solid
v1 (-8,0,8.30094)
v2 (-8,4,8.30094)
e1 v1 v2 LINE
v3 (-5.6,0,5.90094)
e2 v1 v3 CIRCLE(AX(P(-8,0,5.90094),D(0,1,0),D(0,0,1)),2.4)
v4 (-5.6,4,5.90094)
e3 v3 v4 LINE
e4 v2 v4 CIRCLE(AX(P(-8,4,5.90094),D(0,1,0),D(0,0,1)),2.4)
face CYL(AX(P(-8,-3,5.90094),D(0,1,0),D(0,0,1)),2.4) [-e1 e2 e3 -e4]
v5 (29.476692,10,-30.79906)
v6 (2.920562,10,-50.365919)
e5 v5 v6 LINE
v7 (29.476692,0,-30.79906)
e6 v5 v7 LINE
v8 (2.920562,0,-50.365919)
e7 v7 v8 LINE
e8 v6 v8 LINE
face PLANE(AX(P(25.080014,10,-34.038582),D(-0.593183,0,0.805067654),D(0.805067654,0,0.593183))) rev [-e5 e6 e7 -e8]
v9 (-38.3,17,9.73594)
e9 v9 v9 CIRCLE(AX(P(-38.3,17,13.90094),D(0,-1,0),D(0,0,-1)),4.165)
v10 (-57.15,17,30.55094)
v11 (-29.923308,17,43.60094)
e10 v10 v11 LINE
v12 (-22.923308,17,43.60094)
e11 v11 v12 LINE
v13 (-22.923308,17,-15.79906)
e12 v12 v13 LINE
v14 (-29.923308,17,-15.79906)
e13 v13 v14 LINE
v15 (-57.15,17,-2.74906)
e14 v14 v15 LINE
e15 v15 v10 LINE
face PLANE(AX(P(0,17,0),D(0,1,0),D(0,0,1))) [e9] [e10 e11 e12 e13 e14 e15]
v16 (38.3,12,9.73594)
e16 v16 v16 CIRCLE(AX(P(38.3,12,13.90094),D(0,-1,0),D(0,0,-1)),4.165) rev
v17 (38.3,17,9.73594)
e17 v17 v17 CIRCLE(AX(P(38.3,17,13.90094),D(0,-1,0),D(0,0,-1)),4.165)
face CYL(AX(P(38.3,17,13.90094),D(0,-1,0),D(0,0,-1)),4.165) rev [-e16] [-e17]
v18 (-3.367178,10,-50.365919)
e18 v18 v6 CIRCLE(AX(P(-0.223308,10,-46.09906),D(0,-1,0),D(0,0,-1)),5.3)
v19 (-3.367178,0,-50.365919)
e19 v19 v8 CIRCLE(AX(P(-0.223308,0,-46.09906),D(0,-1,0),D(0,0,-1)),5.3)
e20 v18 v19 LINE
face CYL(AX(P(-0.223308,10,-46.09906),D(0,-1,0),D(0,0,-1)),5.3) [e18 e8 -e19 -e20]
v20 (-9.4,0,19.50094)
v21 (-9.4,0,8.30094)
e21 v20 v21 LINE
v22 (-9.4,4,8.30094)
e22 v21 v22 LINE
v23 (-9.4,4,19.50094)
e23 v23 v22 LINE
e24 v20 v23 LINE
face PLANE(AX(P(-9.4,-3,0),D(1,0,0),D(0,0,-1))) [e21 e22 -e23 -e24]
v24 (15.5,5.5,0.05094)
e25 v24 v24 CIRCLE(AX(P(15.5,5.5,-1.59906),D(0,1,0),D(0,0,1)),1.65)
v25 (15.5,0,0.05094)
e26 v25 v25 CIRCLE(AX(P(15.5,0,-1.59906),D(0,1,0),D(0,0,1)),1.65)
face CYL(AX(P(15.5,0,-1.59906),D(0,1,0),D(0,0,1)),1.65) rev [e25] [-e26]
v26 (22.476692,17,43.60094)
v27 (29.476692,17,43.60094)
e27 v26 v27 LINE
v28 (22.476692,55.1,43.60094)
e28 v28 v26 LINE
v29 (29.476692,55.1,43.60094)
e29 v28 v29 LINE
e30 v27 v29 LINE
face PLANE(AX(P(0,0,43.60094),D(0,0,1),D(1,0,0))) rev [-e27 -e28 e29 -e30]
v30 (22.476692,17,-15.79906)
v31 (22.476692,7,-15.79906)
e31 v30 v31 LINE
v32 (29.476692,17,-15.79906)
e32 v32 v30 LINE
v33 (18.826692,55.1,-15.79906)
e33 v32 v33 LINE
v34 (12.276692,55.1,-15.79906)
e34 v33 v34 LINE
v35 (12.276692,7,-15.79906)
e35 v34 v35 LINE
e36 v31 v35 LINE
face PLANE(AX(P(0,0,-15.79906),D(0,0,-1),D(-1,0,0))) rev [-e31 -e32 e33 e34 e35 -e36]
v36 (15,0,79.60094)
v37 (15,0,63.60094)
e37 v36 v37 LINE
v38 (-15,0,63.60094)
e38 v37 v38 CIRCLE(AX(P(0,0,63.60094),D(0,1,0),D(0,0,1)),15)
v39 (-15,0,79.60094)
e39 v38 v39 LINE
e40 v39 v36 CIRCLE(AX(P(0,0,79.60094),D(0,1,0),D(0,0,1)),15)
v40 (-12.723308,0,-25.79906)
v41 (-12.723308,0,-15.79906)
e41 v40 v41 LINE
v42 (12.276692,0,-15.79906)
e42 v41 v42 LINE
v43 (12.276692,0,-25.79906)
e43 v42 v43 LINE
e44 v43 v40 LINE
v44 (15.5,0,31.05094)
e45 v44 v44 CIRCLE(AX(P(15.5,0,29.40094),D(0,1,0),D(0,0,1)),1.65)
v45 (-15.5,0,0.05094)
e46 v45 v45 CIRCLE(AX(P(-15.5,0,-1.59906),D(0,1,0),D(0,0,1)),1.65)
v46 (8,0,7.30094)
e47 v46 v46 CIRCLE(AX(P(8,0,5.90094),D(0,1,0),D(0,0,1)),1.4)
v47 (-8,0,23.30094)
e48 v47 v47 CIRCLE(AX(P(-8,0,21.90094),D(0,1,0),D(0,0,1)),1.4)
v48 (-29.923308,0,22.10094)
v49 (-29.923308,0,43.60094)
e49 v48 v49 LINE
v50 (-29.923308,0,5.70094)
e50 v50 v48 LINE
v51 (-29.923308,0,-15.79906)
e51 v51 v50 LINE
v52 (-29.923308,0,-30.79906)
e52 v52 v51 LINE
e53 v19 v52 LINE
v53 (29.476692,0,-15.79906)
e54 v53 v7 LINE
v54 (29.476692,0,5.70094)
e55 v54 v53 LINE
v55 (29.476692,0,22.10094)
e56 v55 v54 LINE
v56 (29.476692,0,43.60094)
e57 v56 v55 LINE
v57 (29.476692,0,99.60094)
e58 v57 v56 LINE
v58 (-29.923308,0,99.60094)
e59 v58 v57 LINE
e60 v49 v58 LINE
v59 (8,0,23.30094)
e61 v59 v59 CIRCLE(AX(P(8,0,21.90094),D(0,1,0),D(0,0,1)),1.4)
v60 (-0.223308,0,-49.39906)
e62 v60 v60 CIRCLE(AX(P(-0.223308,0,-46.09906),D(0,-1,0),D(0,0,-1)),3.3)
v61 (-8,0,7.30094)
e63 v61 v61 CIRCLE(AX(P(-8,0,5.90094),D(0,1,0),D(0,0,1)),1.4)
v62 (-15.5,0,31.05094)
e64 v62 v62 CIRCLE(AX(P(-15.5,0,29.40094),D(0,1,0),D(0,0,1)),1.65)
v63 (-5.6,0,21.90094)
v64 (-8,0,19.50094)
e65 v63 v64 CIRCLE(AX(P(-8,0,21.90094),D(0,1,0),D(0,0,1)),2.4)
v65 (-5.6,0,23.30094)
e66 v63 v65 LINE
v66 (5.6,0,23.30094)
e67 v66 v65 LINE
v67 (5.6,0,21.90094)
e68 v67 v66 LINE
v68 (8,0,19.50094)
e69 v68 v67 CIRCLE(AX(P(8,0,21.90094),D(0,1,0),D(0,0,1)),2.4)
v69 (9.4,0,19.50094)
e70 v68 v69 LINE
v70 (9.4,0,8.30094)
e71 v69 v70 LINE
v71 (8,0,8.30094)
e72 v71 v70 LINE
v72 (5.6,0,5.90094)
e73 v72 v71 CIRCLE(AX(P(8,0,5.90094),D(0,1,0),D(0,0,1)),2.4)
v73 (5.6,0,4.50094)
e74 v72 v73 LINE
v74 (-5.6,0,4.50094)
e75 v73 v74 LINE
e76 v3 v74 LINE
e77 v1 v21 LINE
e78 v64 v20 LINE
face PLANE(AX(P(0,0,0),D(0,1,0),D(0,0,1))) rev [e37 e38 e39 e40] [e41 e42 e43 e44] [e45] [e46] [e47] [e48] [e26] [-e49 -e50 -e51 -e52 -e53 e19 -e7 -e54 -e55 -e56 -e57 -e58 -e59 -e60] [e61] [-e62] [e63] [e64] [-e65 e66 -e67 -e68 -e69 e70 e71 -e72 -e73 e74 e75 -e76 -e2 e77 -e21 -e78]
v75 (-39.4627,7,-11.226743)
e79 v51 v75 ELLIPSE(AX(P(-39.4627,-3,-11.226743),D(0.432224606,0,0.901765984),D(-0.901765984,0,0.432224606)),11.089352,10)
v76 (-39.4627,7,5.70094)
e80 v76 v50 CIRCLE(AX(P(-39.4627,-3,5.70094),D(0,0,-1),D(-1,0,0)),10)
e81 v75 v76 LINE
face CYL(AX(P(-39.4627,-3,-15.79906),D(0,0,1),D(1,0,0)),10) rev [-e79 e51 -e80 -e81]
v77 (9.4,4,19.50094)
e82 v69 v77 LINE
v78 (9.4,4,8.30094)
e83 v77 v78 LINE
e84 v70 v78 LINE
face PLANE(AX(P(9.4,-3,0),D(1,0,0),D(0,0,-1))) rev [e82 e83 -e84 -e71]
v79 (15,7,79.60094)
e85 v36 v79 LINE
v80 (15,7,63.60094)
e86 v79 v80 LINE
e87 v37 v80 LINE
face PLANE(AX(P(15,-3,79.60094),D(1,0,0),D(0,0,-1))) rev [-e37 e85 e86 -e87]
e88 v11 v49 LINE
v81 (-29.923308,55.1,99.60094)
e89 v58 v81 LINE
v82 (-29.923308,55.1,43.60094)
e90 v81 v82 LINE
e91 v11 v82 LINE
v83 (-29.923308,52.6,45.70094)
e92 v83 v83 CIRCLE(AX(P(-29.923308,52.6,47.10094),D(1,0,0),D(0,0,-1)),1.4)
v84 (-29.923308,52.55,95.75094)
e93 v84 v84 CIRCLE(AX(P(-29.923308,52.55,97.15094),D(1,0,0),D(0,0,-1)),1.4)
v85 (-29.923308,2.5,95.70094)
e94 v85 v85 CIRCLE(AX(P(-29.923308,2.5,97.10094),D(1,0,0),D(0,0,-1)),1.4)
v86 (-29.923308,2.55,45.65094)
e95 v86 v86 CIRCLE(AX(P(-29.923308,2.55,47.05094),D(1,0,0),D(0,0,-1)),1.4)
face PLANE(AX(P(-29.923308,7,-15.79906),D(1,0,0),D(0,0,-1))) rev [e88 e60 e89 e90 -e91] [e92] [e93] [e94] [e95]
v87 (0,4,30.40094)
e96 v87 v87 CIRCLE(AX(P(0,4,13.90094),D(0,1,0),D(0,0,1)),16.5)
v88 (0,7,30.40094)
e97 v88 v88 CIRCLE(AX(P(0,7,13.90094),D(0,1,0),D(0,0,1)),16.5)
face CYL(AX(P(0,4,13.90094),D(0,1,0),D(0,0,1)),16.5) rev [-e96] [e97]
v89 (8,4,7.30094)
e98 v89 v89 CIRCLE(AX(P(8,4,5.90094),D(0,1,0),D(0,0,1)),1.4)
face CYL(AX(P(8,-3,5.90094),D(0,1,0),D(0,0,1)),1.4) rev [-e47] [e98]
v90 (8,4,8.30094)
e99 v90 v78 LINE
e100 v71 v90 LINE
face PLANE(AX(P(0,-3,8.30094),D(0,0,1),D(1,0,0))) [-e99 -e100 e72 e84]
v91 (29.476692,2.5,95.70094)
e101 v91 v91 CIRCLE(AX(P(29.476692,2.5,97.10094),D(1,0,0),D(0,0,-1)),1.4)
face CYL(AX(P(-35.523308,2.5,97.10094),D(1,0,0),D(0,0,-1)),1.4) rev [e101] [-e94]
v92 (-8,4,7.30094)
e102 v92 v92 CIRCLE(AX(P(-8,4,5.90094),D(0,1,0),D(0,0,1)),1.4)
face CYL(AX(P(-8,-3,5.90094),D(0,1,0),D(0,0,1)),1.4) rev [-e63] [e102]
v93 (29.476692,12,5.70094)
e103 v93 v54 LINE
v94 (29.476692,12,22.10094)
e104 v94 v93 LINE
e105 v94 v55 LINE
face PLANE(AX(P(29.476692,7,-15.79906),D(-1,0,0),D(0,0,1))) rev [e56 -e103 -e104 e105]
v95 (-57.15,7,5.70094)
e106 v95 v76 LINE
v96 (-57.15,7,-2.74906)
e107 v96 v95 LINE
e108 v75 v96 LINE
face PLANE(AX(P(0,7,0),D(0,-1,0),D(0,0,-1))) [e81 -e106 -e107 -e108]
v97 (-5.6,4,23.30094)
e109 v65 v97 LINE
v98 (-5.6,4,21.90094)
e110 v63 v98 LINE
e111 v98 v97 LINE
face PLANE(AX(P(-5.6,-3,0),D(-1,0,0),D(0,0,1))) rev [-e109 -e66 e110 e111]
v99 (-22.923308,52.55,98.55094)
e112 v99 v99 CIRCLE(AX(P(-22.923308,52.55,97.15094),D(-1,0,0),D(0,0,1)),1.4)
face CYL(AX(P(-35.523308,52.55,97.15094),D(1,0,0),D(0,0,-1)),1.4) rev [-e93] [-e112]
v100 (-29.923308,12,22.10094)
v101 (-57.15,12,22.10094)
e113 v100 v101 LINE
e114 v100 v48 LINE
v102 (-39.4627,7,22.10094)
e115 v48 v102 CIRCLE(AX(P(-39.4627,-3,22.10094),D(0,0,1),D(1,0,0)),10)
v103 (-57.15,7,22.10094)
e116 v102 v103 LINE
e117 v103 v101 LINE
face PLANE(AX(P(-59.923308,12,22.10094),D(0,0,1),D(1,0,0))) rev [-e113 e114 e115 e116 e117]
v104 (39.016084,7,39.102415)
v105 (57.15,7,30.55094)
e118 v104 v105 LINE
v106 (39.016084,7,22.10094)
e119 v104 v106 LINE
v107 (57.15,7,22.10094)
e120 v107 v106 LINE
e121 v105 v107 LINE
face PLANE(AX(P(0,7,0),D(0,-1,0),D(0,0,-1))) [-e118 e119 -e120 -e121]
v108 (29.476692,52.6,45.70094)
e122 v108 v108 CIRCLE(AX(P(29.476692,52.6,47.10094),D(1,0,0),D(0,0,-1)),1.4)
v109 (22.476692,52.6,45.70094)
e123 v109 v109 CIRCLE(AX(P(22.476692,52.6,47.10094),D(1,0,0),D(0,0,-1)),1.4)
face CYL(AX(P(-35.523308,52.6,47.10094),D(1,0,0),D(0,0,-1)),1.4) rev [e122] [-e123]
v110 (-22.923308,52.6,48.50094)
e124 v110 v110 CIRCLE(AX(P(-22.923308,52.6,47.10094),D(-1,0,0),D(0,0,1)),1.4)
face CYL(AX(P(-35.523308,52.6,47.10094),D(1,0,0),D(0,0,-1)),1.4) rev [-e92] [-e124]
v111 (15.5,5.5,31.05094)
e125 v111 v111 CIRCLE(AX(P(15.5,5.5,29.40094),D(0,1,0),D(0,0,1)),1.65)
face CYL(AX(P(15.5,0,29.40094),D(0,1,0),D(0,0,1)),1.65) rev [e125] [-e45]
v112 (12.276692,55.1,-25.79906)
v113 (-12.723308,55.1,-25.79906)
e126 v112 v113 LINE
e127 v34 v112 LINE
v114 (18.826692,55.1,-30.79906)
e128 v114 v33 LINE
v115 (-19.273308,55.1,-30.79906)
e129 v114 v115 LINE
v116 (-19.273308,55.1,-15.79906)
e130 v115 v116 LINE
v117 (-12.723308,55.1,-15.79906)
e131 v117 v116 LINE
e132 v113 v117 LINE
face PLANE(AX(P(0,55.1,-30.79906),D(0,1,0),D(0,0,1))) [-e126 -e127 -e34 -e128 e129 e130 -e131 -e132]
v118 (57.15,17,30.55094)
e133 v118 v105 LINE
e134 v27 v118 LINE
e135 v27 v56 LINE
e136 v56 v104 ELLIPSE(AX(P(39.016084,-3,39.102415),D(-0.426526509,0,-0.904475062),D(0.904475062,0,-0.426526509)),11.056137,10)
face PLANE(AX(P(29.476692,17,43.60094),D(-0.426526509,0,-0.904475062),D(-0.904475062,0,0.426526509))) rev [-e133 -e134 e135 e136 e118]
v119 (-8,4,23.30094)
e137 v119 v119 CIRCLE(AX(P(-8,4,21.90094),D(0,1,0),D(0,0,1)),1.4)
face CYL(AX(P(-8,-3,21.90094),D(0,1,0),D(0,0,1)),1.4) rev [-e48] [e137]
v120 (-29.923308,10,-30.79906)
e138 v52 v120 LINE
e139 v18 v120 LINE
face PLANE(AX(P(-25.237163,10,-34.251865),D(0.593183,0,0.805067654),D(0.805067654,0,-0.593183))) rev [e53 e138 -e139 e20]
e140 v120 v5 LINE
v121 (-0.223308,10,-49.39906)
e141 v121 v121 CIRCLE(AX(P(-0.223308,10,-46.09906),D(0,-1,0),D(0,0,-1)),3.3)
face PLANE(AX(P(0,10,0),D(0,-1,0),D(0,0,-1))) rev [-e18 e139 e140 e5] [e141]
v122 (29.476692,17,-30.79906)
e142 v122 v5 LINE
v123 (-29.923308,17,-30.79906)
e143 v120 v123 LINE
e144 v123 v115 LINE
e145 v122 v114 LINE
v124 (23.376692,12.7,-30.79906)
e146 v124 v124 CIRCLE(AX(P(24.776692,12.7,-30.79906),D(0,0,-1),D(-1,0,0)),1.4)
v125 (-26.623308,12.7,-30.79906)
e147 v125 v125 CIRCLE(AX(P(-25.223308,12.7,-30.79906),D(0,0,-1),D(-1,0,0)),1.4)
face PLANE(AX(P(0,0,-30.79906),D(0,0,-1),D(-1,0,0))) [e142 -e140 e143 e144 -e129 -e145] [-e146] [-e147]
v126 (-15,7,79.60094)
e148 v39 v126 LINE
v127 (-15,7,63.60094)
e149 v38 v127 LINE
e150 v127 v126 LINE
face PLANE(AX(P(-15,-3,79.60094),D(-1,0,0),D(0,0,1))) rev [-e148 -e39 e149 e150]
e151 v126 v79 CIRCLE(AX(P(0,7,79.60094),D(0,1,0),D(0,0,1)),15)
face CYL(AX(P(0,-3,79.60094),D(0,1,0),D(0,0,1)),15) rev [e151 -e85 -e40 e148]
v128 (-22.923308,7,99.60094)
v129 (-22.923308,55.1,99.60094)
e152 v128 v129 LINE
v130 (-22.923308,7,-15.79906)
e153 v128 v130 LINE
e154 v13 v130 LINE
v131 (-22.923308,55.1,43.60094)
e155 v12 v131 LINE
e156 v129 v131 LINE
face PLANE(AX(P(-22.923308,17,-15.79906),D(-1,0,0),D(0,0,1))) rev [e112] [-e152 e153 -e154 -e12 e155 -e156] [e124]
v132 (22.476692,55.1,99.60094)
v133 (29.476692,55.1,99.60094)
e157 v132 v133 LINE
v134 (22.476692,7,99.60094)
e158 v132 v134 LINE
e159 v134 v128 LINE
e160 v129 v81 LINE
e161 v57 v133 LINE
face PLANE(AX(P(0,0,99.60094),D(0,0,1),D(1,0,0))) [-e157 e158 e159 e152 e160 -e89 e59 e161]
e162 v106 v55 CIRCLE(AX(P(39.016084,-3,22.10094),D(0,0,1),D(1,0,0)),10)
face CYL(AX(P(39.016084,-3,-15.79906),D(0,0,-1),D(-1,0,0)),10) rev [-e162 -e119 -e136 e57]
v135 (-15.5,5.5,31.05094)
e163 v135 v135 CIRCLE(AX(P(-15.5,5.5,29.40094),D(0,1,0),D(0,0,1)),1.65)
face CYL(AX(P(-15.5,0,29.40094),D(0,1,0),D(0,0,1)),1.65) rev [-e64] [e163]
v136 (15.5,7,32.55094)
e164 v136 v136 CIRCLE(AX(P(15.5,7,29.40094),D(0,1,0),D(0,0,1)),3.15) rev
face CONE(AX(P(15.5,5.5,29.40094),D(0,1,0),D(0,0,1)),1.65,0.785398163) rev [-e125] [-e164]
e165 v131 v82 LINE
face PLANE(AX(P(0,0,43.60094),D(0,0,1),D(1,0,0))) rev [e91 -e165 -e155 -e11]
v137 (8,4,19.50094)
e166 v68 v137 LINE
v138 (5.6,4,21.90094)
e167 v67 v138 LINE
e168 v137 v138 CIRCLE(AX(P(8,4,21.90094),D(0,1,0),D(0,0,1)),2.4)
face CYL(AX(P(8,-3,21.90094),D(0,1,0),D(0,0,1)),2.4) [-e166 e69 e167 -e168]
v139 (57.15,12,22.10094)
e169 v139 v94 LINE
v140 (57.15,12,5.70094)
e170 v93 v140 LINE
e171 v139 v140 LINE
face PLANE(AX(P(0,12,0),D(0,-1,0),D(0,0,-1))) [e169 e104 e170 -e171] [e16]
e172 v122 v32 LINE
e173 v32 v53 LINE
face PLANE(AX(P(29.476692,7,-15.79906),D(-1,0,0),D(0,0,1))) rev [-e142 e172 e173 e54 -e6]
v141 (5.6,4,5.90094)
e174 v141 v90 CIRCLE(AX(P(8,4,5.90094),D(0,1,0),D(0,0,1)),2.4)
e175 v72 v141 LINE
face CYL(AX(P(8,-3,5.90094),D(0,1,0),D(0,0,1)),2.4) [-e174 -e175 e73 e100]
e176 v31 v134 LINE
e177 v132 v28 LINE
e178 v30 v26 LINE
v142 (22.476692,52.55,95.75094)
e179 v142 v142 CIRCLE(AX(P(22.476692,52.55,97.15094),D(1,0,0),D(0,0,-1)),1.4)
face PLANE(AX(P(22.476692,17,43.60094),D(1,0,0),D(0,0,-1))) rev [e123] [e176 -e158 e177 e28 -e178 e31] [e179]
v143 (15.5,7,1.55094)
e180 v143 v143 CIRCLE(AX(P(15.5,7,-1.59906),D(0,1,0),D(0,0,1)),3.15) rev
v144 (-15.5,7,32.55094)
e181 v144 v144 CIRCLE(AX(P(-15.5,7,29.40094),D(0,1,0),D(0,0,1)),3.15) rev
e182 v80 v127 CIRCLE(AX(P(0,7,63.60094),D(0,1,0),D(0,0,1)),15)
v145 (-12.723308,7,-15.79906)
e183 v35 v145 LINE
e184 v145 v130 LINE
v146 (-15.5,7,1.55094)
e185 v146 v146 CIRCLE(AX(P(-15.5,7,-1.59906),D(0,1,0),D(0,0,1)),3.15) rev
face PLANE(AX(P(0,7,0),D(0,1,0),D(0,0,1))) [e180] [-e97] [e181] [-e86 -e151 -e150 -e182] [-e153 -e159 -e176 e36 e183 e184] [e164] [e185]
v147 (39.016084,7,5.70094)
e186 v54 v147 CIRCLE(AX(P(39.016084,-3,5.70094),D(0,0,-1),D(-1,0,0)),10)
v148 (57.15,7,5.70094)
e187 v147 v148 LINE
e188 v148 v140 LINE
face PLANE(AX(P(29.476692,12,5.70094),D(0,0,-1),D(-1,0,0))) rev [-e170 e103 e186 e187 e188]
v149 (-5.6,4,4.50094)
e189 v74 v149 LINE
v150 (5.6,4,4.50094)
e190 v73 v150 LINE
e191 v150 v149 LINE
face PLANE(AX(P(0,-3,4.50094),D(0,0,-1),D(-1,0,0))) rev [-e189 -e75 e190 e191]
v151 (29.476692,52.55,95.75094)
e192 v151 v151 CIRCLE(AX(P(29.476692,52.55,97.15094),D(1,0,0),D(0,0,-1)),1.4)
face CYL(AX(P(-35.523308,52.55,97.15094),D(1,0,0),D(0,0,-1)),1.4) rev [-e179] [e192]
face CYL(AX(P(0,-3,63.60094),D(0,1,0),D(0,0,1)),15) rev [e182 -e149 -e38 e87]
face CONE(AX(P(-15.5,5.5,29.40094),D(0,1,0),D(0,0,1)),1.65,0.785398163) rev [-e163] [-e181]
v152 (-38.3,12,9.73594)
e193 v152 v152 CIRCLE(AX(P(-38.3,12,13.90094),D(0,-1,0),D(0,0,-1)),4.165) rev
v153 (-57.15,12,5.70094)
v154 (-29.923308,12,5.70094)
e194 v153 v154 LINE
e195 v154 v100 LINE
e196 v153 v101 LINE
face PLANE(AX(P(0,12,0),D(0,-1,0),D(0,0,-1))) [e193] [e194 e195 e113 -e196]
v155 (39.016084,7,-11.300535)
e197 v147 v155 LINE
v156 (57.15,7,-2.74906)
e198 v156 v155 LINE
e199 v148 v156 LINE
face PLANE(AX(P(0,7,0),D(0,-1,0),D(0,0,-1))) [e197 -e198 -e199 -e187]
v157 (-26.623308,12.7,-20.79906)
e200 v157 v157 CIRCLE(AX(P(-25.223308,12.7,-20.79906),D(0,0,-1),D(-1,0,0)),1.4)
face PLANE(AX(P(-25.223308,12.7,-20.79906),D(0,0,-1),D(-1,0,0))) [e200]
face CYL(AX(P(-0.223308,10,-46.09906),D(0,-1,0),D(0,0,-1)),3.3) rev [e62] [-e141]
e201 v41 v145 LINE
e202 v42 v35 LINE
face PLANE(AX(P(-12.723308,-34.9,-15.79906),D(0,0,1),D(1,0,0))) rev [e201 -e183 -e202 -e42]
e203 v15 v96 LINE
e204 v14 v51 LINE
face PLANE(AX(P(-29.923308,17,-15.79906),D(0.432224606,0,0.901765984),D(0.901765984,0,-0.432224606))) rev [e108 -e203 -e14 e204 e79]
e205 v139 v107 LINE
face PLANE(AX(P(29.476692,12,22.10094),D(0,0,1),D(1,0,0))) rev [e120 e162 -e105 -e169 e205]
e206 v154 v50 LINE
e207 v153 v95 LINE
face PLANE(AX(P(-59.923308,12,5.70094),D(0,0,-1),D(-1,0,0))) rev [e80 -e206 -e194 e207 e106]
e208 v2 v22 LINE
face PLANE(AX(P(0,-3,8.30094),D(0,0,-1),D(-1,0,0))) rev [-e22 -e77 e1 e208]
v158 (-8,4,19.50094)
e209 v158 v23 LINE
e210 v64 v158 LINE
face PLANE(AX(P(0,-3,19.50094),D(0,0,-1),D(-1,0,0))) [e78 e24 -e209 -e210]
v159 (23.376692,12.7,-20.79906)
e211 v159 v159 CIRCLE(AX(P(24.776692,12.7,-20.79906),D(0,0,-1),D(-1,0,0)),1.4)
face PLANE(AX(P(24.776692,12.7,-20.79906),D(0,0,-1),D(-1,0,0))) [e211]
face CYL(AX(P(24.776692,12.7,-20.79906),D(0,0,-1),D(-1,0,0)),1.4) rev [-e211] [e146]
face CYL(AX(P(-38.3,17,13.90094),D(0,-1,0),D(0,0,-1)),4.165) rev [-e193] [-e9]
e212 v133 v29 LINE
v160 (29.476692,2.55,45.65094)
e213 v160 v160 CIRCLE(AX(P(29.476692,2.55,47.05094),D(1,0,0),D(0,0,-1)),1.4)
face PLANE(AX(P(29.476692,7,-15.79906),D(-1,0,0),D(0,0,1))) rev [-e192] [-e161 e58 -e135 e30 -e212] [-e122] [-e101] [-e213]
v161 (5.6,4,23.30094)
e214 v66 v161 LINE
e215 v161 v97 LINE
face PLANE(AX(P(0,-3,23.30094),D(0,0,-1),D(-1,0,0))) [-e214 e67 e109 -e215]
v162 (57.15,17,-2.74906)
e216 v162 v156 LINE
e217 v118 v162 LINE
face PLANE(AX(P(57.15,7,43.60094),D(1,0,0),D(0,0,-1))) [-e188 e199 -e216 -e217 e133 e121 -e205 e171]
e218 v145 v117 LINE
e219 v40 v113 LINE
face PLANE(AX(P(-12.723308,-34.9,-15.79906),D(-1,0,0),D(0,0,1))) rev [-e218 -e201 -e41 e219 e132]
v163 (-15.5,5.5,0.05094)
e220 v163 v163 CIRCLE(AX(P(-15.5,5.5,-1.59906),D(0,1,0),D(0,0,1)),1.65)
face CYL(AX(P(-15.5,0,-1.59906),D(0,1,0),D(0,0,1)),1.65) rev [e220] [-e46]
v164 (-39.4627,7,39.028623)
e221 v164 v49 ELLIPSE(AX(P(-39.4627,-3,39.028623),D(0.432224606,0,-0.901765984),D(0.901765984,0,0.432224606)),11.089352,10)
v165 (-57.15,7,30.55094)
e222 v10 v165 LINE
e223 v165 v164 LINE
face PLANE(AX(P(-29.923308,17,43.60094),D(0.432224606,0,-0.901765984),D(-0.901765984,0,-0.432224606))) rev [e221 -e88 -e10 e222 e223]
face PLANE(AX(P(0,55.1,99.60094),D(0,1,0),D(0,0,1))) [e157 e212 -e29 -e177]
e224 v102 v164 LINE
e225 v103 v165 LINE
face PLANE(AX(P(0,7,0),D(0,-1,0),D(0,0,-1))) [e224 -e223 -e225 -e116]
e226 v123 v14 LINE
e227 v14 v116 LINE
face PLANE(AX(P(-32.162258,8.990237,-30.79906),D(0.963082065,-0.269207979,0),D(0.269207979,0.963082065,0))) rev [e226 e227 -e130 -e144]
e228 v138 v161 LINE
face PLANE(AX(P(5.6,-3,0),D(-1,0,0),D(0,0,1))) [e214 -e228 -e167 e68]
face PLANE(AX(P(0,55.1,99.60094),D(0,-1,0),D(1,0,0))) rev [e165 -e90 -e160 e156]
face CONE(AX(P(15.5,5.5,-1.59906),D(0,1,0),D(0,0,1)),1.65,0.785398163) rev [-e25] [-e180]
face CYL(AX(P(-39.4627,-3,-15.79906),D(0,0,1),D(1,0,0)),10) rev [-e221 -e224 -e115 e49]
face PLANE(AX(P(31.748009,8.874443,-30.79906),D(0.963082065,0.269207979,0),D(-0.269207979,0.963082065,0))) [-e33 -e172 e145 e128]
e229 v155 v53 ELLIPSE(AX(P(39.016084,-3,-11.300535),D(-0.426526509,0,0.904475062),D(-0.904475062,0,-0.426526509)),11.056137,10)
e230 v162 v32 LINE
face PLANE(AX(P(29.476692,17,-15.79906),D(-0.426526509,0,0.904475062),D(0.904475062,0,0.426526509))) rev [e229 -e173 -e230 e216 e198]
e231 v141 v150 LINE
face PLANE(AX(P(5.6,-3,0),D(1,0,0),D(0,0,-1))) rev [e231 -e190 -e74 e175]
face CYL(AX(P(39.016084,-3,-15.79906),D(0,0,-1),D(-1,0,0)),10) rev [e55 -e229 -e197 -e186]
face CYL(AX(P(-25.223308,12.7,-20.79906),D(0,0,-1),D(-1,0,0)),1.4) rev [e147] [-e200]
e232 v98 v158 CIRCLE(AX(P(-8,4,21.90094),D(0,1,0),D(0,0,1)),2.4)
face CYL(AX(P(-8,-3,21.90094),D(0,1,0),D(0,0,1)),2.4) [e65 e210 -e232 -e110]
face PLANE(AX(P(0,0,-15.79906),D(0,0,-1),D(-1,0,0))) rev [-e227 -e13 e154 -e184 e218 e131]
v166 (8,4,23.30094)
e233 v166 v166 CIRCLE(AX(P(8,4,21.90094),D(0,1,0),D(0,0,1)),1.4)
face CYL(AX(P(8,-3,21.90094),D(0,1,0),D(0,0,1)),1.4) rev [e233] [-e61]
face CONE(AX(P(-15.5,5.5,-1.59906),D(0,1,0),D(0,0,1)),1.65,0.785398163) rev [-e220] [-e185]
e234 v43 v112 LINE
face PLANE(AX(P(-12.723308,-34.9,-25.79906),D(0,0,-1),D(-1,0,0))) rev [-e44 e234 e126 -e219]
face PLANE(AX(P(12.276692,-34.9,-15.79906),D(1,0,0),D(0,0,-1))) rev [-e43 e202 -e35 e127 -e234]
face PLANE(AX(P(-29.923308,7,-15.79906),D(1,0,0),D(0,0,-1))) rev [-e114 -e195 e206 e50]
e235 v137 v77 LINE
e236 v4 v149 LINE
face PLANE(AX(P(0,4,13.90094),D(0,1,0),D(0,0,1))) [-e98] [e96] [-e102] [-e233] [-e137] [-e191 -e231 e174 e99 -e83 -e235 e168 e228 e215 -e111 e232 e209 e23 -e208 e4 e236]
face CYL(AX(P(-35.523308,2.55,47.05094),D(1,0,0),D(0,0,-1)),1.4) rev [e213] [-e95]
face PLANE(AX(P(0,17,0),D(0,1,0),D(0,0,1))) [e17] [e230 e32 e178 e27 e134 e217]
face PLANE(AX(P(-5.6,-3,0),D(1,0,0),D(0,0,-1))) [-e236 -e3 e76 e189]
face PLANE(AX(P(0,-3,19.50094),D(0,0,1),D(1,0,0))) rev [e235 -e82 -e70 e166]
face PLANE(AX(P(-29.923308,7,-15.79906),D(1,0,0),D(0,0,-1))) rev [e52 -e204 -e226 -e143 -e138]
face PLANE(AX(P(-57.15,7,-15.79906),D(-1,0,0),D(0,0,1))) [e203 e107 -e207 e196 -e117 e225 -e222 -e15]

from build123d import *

# Parameters (mm, degrees)
SKETCH1_W           = 59.4
SKETCH1_H           = 59.4
BOSS_EXTRUDE1_DEPTH = 7
SKETCH2_R           = 16.5
CUT_EXTRUDE1_DEPTH  = 3
SKETCH4_R           = 1.65
CUT_EXTRUDE2_DEPTH  = 7
CHAMFER1_SIZE       = 1.5
SKETCH5_R           = 1.4
CUT_EXTRUDE3_DEPTH  = 7
SKETCH6_W           = 7
SKETCH6_H           = 59.4
BOSS_EXTRUDE2_DEPTH = 10
SKETCH7_W           = 27.226691729
SKETCH7_H           = 59.4
SKETCH7_W_2         = 27.673308271
BOSS_EXTRUDE3_DEPTH = 10
SKETCH8_R           = 4.165
CUT_EXTRUDE4_DEPTH  = 10
SKETCH9_W           = 30
SKETCH9_H           = 16.4
SKETCH9_W_2         = 36.39158208
CUT_EXTRUDE5_DEPTH  = 5
CUT_EXTRUDE6_DEPTH  = 10
BOSS_EXTRUDE4_DEPTH = 15
SKETCH12_W          = 25
SKETCH12_H          = 10
CUT_EXTRUDE7_DEPTH  = 90
SKETCH13_R          = 5.3
SKETCH13_R_2        = 3.3
BOSS_EXTRUDE5_DEPTH = 10
SKETCH14_R          = 1.4
CUT_EXTRUDE8_DEPTH  = 10
SKETCH17_W          = 7
SKETCH17_H          = 38.1
SKETCH17_W_2        = 45.4
SKETCH17_H_2        = 7
BOSS_EXTRUDE8_DEPTH = 56
FILLET1_R           = 10
SKETCH18_R          = 1.4
CUT_EXTRUDE10_DEPTH = 65
CUT_EXTRUDE12_DEPTH = 10


with BuildPart() as part:
    # Sketch1 → Boss-Extrude1 (new body)
    with BuildSketch(Plane(origin=(0, 0, 0), x_dir=(1, 0, 0), z_dir=(0, 1, 0))):
        with Locations((-0.223308271, -13.90093985)):
            Rectangle(SKETCH1_W, SKETCH1_H)
    extrude(amount=BOSS_EXTRUDE1_DEPTH)

    # Sketch2 → Cut-Extrude1 (cut)
    with BuildSketch(Plane(origin=(0, 7, 0), x_dir=(1, 0, 0), z_dir=(0, 1, 0))):
        with Locations(Location((0, -13.90093985, 0), (0, 0, 270))):
            Circle(SKETCH2_R)
    extrude(amount=-CUT_EXTRUDE1_DEPTH, mode=Mode.SUBTRACT)

    # Sketch4 → Cut-Extrude2 (cut)
    with BuildSketch(Plane(origin=(0, 7, 0), x_dir=(1, 0, 0), z_dir=(0, 1, 0))):
        with Locations(Location((-15.5, 1.59906015, 0), (0, 0, 270))):
            Circle(SKETCH4_R)
        with Locations(Location((15.5, 1.59906015, 0), (0, 0, 270))):
            Circle(SKETCH4_R)
        with Locations(Location((15.5, -29.40093985, 0), (0, 0, 270))):
            Circle(SKETCH4_R)
        with Locations(Location((-15.5, -29.40093985, 0), (0, 0, 270))):
            Circle(SKETCH4_R)
    extrude(amount=-CUT_EXTRUDE2_DEPTH, mode=Mode.SUBTRACT)

    # Chamfer1
    chamfer1_edges = [part.edges().sort_by_distance(p)[0] for p in [
        (-15.5, 7, 27.75093985),
        (15.5, 7, 27.75093985),
        (15.5, 7, -3.24906015),
        (-15.5, 7, -3.24906015),
    ]]
    chamfer(chamfer1_edges, length=CHAMFER1_SIZE)

    # Sketch5 → Cut-Extrude3 (cut)
    with BuildSketch(Plane(origin=(0, 4, 0), x_dir=(1, 0, 0), z_dir=(0, 1, 0))):
        with BuildLine():
            Line((9.4, -13.90093985), (0, -13.90093985))
            Line((0, -13.90093985), (0, -23.30093985))
            Line((0, -23.30093985), (5.6, -23.30093985))
            Line((5.6, -23.30093985), (5.6, -21.90093985))
            ThreePointArc((5.6, -21.90093985), (6.302943725, -20.203883575), (8, -19.50093985))
            Line((8, -19.50093985), (9.4, -19.50093985))
            Line((9.4, -19.50093985), (9.4, -13.90093985))
        make_face()
        with BuildLine():
            Line((0, -13.90093985), (-9.4, -13.90093985))
            Line((-9.4, -13.90093985), (-9.4, -19.50093985))
            Line((-9.4, -19.50093985), (-8, -19.50093985))
            ThreePointArc((-8, -19.50093985), (-6.302943725, -20.203883575), (-5.6, -21.90093985))
            Line((-5.6, -21.90093985), (-5.6, -23.30093985))
            Line((-5.6, -23.30093985), (0, -23.30093985))
            Line((0, -23.30093985), (0, -13.90093985))
        make_face()
        with BuildLine():
            ThreePointArc((-5.6, -5.90093985), (-6.302943725, -7.597996124), (-8, -8.30093985))
            Line((-8, -8.30093985), (-9.4, -8.30093985))
            Line((-9.4, -8.30093985), (-9.4, -13.90093985))
            Line((-9.4, -13.90093985), (0, -13.90093985))
            Line((0, -13.90093985), (0, -4.50093985))
            Line((0, -4.50093985), (-5.6, -4.50093985))
            Line((-5.6, -4.50093985), (-5.6, -5.90093985))
        make_face()
        with BuildLine():
            Line((0, -4.50093985), (0, -13.90093985))
            Line((0, -13.90093985), (9.4, -13.90093985))
            Line((9.4, -13.90093985), (9.4, -8.30093985))
            Line((9.4, -8.30093985), (8, -8.30093985))
            ThreePointArc((8, -8.30093985), (6.302943725, -7.597996124), (5.6, -5.90093985))
            Line((5.6, -5.90093985), (5.6, -4.50093985))
            Line((5.6, -4.50093985), (0, -4.50093985))
        make_face()
        with Locations(Location((8, -5.90093985, 0), (0, 0, 270))):
            Circle(SKETCH5_R)
        with Locations(Location((-8, -5.90093985, 0), (0, 0, 270))):
            Circle(SKETCH5_R)
        with Locations(Location((-8, -21.90093985, 0), (0, 0, 270))):
            Circle(SKETCH5_R)
        with Locations(Location((8, -21.90093985, 0), (0, 0, 270))):
            Circle(SKETCH5_R)
    extrude(amount=-CUT_EXTRUDE3_DEPTH, mode=Mode.SUBTRACT)

    # Sketch6 → Boss-Extrude2 (add)
    with BuildSketch(Plane(origin=(0, 7, 0), x_dir=(1, 0, 0), z_dir=(0, 1, 0))):
        with Locations((-26.423308271, -13.90093985)):
            Rectangle(SKETCH6_W, SKETCH6_H)
        with Locations((25.976691729, -13.90093985)):
            Rectangle(SKETCH6_W, SKETCH6_H)
    extrude(amount=BOSS_EXTRUDE2_DEPTH)

    # Sketch7 → Boss-Extrude3 (add)
    with BuildSketch(Plane(origin=(0, 17, 0), x_dir=(1, 0, 0), z_dir=(0, 1, 0))):
        with Locations((-43.536654136, -13.90093985)):
            Rectangle(SKETCH7_W, SKETCH7_H)
        with Locations((43.313345865, -13.90093985)):
            Rectangle(SKETCH7_W_2, SKETCH7_H)
    extrude(amount=-BOSS_EXTRUDE3_DEPTH)

    # Sketch8 → Cut-Extrude4 (cut)
    with BuildSketch(Plane.XZ.offset(-7)):
        with Locations(Location((-38.3, 13.90093985, 0), (0, 0, 270))):
            Circle(SKETCH8_R)
        with Locations(Location((38.3, 13.90093985, 0), (0, 0, 270))):
            Circle(SKETCH8_R)
    extrude(amount=-CUT_EXTRUDE4_DEPTH, mode=Mode.SUBTRACT)

    # Sketch9 → Cut-Extrude5 (cut)
    with BuildSketch(Plane.XZ.offset(-7)):
        with Locations((-44.923308271, 13.90093985)):
            Rectangle(SKETCH9_W, SKETCH9_H)
        with Locations((47.672482769, 13.90093985)):
            Rectangle(SKETCH9_W_2, SKETCH9_H)
    extrude(amount=-CUT_EXTRUDE5_DEPTH, mode=Mode.SUBTRACT)

    # Sketch10 → Cut-Extrude6 (cut)
    with BuildSketch(Plane.XZ.offset(-7)):
        Polygon((29.476691729, 43.60093985), (57.15, 30.55093985), (76.62509514, 37.490170253), (62.940914395, 60.152042306), align=None)
        Polygon((29.476691729, -15.79906015), (57.15, -2.74906015), (74.309790283, -17.328421705), (51.423897195, -33.903905564), align=None)
        Polygon((-29.923308271, 43.60093985), (-57.15, 30.55093985), (-87.322044428, 42.719817872), (-44.416875265, 63.284654142), align=None)
        Polygon((-29.923308271, -15.79906015), (-57.15, -2.74906015), (-80.43240027, -17.331293655), (-52.631456994, -33.827579257), align=None)
    extrude(amount=-CUT_EXTRUDE6_DEPTH, mode=Mode.SUBTRACT)

    # Sketch11 → Boss-Extrude4 (add)
    with BuildSketch(Plane(origin=(0, 0, -15.79906015), x_dir=(-1, 0, 0), z_dir=(0, 0, -1))):
        Polygon((-29.476691729, 17), (-29.476691729, 0), (29.923308271, 0), (29.923308271, 17), (19.273308271, 55.1), (-18.826691729, 55.1), align=None)
    extrude(amount=BOSS_EXTRUDE4_DEPTH)

    # Sketch12 → Cut-Extrude7 (cut)
    with BuildSketch(Plane(origin=(0, 55.1, 0), x_dir=(1, 0, 0), z_dir=(0, 1, 0))):
        with Locations((-0.223308271, 20.79906015)):
            Rectangle(SKETCH12_W, SKETCH12_H)
    extrude(amount=-CUT_EXTRUDE7_DEPTH, mode=Mode.SUBTRACT)

    # Sketch13 → Boss-Extrude5 (add)
    # profile 1 of 2: a face of its own
    with BuildSketch(Plane.XZ):
        with BuildLine():
            Line((-29.923308271, -30.79906015), (-3.367178173, -50.365918718))
            ThreePointArc((-3.367178173, -50.365918718), (-2.613652338, -41.368705487), (5.076691729, -46.09906015))
            ThreePointArc((5.076691729, -46.09906015), (4.507046393, -48.489404218), (2.920561631, -50.365918718))
            Line((2.920561631, -50.365918718), (29.476691729, -30.79906015))
            Line((29.476691729, -30.79906015), (-29.923308271, -30.79906015))
        make_face()
    # profile 2 of 2: a face of its own
    with BuildSketch(Plane.XZ):
        with Locations((-0.223308271, -46.09906015)):
            Circle(SKETCH13_R)
        with Locations(Location((-0.223308271, -46.09906015, 0), (0, 0, 270))):
            Circle(SKETCH13_R_2, mode=Mode.SUBTRACT)
    extrude(amount=-BOSS_EXTRUDE5_DEPTH)

    # Sketch14 → Cut-Extrude8 (cut)
    with BuildSketch(Plane(origin=(0, 0, -30.79906015), x_dir=(-1, 0, 0), z_dir=(0, 0, -1))):
        with Locations((-24.776691729, 12.7)):
            Circle(SKETCH14_R)
        with Locations((25.223308271, 12.7)):
            Circle(SKETCH14_R)
    extrude(amount=-CUT_EXTRUDE8_DEPTH, mode=Mode.SUBTRACT)

    # Sketch17 → Boss-Extrude8 (add)
    with BuildSketch(Plane.XY.offset(43.60093985)):
        with Locations((-26.423308271, 36.05)):
            Rectangle(SKETCH17_W, SKETCH17_H)
        Polygon((-22.923308271, 0), (-22.923308271, 7), (-22.923308271, 17), (-29.923308271, 17), (-29.923308271, 7), (-29.923308271, 0), align=None)
        with Locations((-0.223308271, 3.5)):
            Rectangle(SKETCH17_W_2, SKETCH17_H_2)
        Polygon((22.476691729, 17), (22.476691729, 7), (22.476691729, 0), (29.476691729, 0), (29.476691729, 7), (29.476691729, 17), align=None)
        with Locations((25.976691729, 36.05)):
            Rectangle(SKETCH17_W, SKETCH17_H)
    extrude(amount=BOSS_EXTRUDE8_DEPTH)

    # Fillet1
    # the kernel refuses this fillet: 10 mm, written as the material it adds along each edge
    with BuildSketch(Plane(origin=(-29.923308271, 7, 67.449419885), x_dir=(0, -1, 0), z_dir=(0, 0, -1))) as fillet1_piece_1_section:
        with BuildLine():
            CenterArc((10, 9.539392014), FILLET1_R, 180, 72.542396876)
            Line((0, 9.539392014), (-0.2, 9.539392014))
            Line((-0.2, 9.539392014), (-0.2, 0))
            Line((-0.2, 0), (0, -0.2))
            ThreePointArc((0, -0.2), (3.5, -0.2), (6.94, -0.19078784))
            Line((6.94, -0.19078784), (7, 0))
        make_face()
    fillet1_piece_1 = extrude(amount=45.348480035, mode=Mode.PRIVATE)
    fillet1_piece_1 = split(fillet1_piece_1, bisect_by=Plane(origin=(-36.079766586, 5.164687133, 40.650093606), z_dir=(0.43222460559101666, 0, -0.9017659842340973)), keep=Keep.TOP, mode=Mode.PRIVATE)
    add(fillet1_piece_1)
    with BuildSketch(Plane(origin=(-29.923308271, 7, 67.449419885), x_dir=(0, -1, 0), z_dir=(0, 0, -1))) as fillet1_piece_2_section:
        with BuildLine():
            CenterArc((10, 9.539392014), FILLET1_R, 180, 72.542396876)
            Line((0, 9.539392014), (-0.2, 9.539392014))
            Line((-0.2, 9.539392014), (-0.2, 0))
            Line((-0.2, 0), (0, -0.2))
            ThreePointArc((0, -0.2), (3.5, -0.2), (6.94, -0.19078784))
            Line((6.94, -0.19078784), (7, 0))
        make_face()
    fillet1_piece_2 = extrude(amount=69.196960071, mode=Mode.PRIVATE)
    fillet1_piece_2 = split(fillet1_piece_2, bisect_by=Plane(origin=(-32.194534149, 5.212182004, 5.70093985), z_dir=(0, 0, -1)), keep=Keep.TOP, mode=Mode.PRIVATE)
    add(fillet1_piece_2)
    with BuildSketch(Plane(origin=(29.476691729, 7, -39.647540186), x_dir=(0, -1, 0), z_dir=(0, 0, 1))) as fillet1_piece_3_section:
        with BuildLine():
            CenterArc((10, 9.539392014), FILLET1_R, 180, 72.542396876)
            Line((0, 9.539392014), (-0.2, 9.539392014))
            Line((-0.2, 9.539392014), (-0.2, 0))
            Line((-0.2, 0), (0, -0.2))
            ThreePointArc((0, -0.2), (3.5, -0.2), (6.94, -0.19078784))
            Line((6.94, -0.19078784), (7, 0))
        make_face()
    fillet1_piece_3 = extrude(amount=45.348480035, mode=Mode.PRIVATE)
    fillet1_piece_3 = split(fillet1_piece_3, bisect_by=Plane(origin=(35.597218228, 5.165493834, -12.91278179), z_dir=(-0.4265265085615614, 0, 0.9044750618421077)), keep=Keep.TOP, mode=Mode.PRIVATE)
    add(fillet1_piece_3)
    with BuildSketch(Plane(origin=(29.476691729, 7, -39.647540186), x_dir=(0, -1, 0), z_dir=(0, 0, 1))) as fillet1_piece_4_section:
        with BuildLine():
            CenterArc((10, 9.539392014), FILLET1_R, 180, 72.542396876)
            Line((0, 9.539392014), (-0.2, 9.539392014))
            Line((-0.2, 9.539392014), (-0.2, 0))
            Line((-0.2, 0), (0, -0.2))
            ThreePointArc((0, -0.2), (3.5, -0.2), (6.94, -0.19078784))
            Line((6.94, -0.19078784), (7, 0))
        make_face()
    fillet1_piece_4 = extrude(amount=69.196960071, mode=Mode.PRIVATE)
    fillet1_piece_4 = split(fillet1_piece_4, bisect_by=Plane(origin=(31.747917608, 5.212182004, 22.10093985), z_dir=(0, 0, 1)), keep=Keep.TOP, mode=Mode.PRIVATE)
    add(fillet1_piece_4)
    with BuildSketch(Plane(origin=(29.476691729, 7, -1.747540186), x_dir=(0, -1, 0), z_dir=(0, 0, 1))) as fillet1_piece_5_section:
        with BuildLine():
            CenterArc((10, 9.539392014), FILLET1_R, 180, 72.542396876)
            Line((0, 9.539392014), (-0.2, 9.539392014))
            Line((-0.2, 9.539392014), (-0.2, 0))
            Line((-0.2, 0), (0, -0.2))
            ThreePointArc((0, -0.2), (3.5, -0.2), (6.94, -0.19078784))
            Line((6.94, -0.19078784), (7, 0))
        make_face()
    fillet1_piece_5 = extrude(amount=69.196960071, mode=Mode.PRIVATE)
    fillet1_piece_5 = split(fillet1_piece_5, bisect_by=Plane(origin=(31.747917608, 5.212182004, 5.70093985), z_dir=(0, 0, -1)), keep=Keep.TOP, mode=Mode.PRIVATE)
    add(fillet1_piece_5)
    with BuildSketch(Plane(origin=(29.476691729, 7, 22.10093985), x_dir=(0, -1, 0), z_dir=(0, 0, 1))) as fillet1_piece_6_section:
        with BuildLine():
            CenterArc((10, 9.539392014), FILLET1_R, 180, 72.542396876)
            Line((0, 9.539392014), (-0.2, 9.539392014))
            Line((-0.2, 9.539392014), (-0.2, 0))
            Line((-0.2, 0), (0, -0.2))
            ThreePointArc((0, -0.2), (3.5, -0.2), (6.94, -0.19078784))
            Line((6.94, -0.19078784), (7, 0))
        make_face()
    fillet1_piece_6 = extrude(amount=45.348480035, mode=Mode.PRIVATE)
    fillet1_piece_6 = split(fillet1_piece_6, bisect_by=Plane(origin=(35.597218228, 5.165493834, 40.71466149), z_dir=(-0.4265265085615609, 0, -0.9044750618421078)), keep=Keep.TOP, mode=Mode.PRIVATE)
    add(fillet1_piece_6)
    with BuildSketch(Plane(origin=(-29.923308271, 7, 29.549419885), x_dir=(0, -1, 0), z_dir=(0, 0, -1))) as fillet1_piece_7_section:
        with BuildLine():
            CenterArc((10, 9.539392014), FILLET1_R, 180, 72.542396876)
            Line((0, 9.539392014), (-0.2, 9.539392014))
            Line((-0.2, 9.539392014), (-0.2, 0))
            Line((-0.2, 0), (0, -0.2))
            ThreePointArc((0, -0.2), (3.5, -0.2), (6.94, -0.19078784))
            Line((6.94, -0.19078784), (7, 0))
        make_face()
    fillet1_piece_7 = extrude(amount=69.196960071, mode=Mode.PRIVATE)
    fillet1_piece_7 = split(fillet1_piece_7, bisect_by=Plane(origin=(-32.194534149, 5.212182004, 22.10093985), z_dir=(0, 0, 1)), keep=Keep.TOP, mode=Mode.PRIVATE)
    add(fillet1_piece_7)
    with BuildSketch(Plane(origin=(-29.923308271, 7, 5.70093985), x_dir=(0, -1, 0), z_dir=(0, 0, -1))) as fillet1_piece_8_section:
        with BuildLine():
            CenterArc((10, 9.539392014), FILLET1_R, 180, 72.542396876)
            Line((0, 9.539392014), (-0.2, 9.539392014))
            Line((-0.2, 9.539392014), (-0.2, 0))
            Line((-0.2, 0), (0, -0.2))
            ThreePointArc((0, -0.2), (3.5, -0.2), (6.94, -0.19078784))
            Line((6.94, -0.19078784), (7, 0))
        make_face()
    fillet1_piece_8 = extrude(amount=45.348480035, mode=Mode.PRIVATE)
    fillet1_piece_8 = split(fillet1_piece_8, bisect_by=Plane(origin=(-36.079766586, 5.164687133, -12.848213907), z_dir=(0.4322246055910173, 0, 0.901765984234097)), keep=Keep.TOP, mode=Mode.PRIVATE)
    add(fillet1_piece_8)

    # Sketch18 → Cut-Extrude10 (cut)
    with BuildSketch(Plane(origin=(29.476691729, 0, 0), x_dir=(0, 0, -1), z_dir=(1, 0, 0))):
        with Locations((-97.10093985, 2.5)):
            Circle(SKETCH18_R)
        with Locations((-97.15093985, 52.55)):
            Circle(SKETCH18_R)
        with Locations((-47.10093985, 52.6)):
            Circle(SKETCH18_R)
        with Locations((-47.05093985, 2.55)):
            Circle(SKETCH18_R)
    extrude(amount=-CUT_EXTRUDE10_DEPTH, mode=Mode.SUBTRACT)

    # Sketch19 → Cut-Extrude12 (cut)
    with BuildSketch(Plane(origin=(0, 7, 0), x_dir=(1, 0, 0), z_dir=(0, 1, 0))):
        with BuildLine():
            Line((-15, -79.60093985), (-15, -63.60093985))
            ThreePointArc((-15, -63.60093985), (0, -48.60093985), (15, -63.60093985))
            Line((15, -63.60093985), (15, -79.60093985))
            ThreePointArc((15, -79.60093985), (0, -94.60093985), (-15, -79.60093985))
        make_face()
    extrude(amount=-CUT_EXTRUDE12_DEPTH, mode=Mode.SUBTRACT)


solid = part.part
